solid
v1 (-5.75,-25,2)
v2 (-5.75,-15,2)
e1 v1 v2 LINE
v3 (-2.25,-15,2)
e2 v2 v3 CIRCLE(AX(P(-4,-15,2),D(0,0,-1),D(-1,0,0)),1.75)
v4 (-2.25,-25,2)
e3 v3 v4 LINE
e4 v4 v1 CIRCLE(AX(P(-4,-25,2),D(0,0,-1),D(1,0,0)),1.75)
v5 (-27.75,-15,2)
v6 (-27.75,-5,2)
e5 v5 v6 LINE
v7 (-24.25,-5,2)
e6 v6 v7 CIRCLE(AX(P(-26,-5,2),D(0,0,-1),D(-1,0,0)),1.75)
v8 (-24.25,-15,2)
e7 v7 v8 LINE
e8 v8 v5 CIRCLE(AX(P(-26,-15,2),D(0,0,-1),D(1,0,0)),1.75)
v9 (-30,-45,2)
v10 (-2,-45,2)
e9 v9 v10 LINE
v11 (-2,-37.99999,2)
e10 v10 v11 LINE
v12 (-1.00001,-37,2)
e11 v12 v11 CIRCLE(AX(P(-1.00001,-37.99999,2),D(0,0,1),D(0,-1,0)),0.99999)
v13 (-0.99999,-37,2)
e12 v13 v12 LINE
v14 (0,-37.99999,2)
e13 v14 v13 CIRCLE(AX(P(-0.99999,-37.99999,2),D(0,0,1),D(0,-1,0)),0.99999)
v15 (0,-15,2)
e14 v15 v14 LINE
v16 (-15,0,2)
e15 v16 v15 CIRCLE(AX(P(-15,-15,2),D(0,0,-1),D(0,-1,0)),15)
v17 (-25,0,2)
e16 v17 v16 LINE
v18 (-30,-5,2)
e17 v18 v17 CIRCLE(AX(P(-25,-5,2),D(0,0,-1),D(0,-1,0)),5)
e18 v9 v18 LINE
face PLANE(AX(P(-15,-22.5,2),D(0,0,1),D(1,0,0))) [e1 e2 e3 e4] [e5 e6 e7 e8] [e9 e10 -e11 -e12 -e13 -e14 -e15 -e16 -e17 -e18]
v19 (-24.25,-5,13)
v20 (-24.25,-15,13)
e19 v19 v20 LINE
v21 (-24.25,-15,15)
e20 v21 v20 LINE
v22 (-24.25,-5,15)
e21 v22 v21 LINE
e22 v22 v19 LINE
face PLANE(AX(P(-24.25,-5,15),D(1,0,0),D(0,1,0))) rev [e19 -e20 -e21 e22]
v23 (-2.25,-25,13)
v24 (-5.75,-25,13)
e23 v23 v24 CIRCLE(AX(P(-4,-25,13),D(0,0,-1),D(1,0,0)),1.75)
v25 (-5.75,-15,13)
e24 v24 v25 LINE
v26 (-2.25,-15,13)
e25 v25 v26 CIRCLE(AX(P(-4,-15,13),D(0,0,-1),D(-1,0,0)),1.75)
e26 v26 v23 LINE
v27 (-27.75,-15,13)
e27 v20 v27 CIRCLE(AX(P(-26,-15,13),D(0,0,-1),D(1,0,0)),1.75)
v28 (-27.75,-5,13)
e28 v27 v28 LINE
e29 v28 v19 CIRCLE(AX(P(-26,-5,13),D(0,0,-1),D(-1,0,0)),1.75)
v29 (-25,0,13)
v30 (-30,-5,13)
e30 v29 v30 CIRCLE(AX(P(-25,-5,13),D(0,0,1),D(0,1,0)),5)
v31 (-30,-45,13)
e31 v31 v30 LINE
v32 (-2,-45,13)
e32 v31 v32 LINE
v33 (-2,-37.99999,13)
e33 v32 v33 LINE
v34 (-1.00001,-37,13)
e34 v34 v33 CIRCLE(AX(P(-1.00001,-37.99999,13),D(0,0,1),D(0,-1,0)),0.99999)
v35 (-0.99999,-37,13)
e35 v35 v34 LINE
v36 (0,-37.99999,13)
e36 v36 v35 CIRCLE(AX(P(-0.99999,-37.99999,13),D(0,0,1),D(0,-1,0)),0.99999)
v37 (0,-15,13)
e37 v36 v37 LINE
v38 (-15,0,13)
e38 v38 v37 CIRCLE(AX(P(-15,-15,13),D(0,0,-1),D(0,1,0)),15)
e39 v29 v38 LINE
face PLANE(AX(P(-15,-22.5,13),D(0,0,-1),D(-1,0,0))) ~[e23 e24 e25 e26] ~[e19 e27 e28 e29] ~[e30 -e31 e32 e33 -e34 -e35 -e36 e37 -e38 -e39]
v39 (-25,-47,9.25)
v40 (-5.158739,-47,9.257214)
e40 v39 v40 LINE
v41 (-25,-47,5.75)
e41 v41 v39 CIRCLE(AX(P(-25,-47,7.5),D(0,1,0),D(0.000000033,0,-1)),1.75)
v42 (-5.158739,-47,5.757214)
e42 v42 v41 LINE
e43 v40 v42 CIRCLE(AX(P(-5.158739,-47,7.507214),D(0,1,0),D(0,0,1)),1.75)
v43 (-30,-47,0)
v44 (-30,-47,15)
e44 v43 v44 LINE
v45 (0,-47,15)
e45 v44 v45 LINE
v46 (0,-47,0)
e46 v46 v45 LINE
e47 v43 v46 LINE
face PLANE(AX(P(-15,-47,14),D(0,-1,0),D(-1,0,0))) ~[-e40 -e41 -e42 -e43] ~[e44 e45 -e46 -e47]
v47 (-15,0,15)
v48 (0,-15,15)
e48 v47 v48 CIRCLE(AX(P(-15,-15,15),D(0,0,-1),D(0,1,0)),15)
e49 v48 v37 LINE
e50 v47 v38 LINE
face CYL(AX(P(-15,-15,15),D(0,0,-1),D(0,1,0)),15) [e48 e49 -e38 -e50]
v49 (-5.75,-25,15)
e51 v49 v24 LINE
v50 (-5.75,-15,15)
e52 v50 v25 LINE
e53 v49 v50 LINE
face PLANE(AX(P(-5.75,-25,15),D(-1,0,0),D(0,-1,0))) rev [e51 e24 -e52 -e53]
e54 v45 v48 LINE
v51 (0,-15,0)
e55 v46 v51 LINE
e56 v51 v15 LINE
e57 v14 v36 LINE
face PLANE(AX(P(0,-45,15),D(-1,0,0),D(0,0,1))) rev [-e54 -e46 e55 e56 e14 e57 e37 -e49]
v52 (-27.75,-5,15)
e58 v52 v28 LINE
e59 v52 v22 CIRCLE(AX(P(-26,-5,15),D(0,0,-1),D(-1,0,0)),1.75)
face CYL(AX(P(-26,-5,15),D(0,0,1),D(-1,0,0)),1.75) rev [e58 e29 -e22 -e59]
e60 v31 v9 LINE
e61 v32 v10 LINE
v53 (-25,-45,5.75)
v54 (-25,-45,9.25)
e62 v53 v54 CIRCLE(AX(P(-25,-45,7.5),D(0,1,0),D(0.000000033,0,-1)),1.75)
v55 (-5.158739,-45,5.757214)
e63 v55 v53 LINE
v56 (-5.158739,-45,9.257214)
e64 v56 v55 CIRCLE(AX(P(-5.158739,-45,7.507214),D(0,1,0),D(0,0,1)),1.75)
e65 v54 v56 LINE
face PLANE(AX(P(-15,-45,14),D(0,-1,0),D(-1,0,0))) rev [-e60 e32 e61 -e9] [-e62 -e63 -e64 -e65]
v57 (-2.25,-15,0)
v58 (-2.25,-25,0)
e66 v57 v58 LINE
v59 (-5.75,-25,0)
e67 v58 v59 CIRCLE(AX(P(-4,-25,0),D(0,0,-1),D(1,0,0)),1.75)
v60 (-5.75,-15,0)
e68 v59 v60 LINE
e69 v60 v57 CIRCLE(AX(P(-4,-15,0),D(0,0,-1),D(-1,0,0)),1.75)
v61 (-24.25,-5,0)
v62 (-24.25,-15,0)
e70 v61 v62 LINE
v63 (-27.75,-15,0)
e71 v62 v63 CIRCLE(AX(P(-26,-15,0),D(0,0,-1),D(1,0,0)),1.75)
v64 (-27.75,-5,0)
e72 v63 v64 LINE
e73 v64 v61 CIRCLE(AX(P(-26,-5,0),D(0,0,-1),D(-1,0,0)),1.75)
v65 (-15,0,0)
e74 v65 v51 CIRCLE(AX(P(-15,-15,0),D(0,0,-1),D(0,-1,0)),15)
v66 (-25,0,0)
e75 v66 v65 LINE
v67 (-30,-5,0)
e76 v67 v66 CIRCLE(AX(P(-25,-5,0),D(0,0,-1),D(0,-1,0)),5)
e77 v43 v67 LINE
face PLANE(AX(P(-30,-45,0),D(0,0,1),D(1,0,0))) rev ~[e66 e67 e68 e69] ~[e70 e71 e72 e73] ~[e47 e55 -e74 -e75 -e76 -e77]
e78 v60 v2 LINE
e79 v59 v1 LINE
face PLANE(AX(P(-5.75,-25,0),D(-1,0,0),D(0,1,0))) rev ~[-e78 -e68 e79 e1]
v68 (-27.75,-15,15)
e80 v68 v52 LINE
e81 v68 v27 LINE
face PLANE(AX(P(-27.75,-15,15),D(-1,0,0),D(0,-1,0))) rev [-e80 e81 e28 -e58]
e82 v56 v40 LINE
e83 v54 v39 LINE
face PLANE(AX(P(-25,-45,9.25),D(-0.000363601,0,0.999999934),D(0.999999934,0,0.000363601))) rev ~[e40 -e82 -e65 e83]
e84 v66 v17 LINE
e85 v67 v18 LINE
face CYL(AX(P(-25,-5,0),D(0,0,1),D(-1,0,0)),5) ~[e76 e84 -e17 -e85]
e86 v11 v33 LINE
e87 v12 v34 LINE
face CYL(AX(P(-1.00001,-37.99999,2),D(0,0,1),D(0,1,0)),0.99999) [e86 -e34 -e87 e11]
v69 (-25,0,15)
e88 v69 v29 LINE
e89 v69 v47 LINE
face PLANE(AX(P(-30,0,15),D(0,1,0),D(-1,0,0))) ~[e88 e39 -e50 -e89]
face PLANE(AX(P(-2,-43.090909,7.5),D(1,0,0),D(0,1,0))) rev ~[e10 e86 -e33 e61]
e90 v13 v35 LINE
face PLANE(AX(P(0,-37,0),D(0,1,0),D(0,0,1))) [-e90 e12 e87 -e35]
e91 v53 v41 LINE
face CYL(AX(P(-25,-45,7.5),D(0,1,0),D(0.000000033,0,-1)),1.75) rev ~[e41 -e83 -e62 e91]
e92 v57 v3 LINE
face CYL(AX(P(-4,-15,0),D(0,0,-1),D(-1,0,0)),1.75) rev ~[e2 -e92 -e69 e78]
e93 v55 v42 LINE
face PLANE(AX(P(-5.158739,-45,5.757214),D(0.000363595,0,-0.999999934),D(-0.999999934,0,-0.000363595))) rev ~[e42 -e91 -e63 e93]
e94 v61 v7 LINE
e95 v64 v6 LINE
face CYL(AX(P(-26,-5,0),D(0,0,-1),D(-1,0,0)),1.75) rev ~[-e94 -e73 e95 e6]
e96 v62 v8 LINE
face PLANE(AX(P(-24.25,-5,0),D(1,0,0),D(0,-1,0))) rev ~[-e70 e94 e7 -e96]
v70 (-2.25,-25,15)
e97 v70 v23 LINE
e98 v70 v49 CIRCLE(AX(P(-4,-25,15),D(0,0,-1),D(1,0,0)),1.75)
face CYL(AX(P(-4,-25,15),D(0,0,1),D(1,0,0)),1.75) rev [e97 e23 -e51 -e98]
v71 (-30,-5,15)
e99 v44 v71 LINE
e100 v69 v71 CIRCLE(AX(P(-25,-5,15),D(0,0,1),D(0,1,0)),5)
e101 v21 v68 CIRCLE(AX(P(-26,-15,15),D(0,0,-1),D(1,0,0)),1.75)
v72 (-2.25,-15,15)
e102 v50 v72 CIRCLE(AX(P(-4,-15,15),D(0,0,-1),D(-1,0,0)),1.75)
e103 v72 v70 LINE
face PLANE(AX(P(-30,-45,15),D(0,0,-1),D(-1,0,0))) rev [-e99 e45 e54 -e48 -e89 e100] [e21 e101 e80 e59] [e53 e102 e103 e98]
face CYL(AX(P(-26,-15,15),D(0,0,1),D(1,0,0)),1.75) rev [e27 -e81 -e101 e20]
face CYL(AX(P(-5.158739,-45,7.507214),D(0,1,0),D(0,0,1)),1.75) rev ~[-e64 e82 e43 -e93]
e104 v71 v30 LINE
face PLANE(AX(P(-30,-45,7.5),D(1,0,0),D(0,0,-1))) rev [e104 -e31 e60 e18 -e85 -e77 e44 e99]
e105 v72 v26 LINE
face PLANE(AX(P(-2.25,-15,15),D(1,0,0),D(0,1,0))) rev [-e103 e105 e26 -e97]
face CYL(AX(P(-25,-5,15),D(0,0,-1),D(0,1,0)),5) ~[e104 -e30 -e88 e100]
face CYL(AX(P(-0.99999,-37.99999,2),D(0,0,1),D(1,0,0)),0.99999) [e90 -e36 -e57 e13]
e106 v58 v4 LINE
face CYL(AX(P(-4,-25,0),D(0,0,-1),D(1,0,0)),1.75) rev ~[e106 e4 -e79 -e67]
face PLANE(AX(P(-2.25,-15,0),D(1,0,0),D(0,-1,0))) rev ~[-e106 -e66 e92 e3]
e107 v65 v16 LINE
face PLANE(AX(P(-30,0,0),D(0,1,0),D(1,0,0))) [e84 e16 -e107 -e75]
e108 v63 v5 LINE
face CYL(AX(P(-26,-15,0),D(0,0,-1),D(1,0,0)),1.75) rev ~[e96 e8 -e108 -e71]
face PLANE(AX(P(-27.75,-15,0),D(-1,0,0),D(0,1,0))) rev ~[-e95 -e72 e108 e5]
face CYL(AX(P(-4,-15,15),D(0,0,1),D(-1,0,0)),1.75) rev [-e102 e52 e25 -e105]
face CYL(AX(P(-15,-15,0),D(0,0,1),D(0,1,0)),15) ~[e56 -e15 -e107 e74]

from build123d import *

# Parameters (mm, degrees)
F0_W     = 30
F0_H     = 45
F1_DEPTH = 2
F2_W     = 30
F2_H     = 2
F2_H_2   = 5.5
F3_DEPTH = 2
F6_DEPTH = 25
F7_W     = 8
F7_H     = 11
F8_DEPTH = 2
F9_R     = 15
F10_R    = 5
F11_R    = 0.99999


# Not quite as in the source:
# - a fillet or chamfer is up to 0.001 mm smaller than in the source, because OpenCascade refuses the exact size
# - ends of sketch curves that miss each other by under 0.0002 mm in the source are joined


with BuildPart() as f1:
    # F0 (on Top) → F1 (new body)
    with BuildSketch(Plane.XY):
        with Locations((-15, -22.5)):
            Rectangle(F0_W, F0_H)
        with BuildLine():
            ThreePointArc((-27.75, -5), (-26, -3.25), (-24.25, -5))
            Line((-24.25, -5), (-24.25, -15))
            ThreePointArc((-24.25, -15), (-26, -16.75), (-27.75, -15))
            Line((-27.75, -15), (-27.75, -5))
        make_face(mode=Mode.SUBTRACT)
        with BuildLine():
            Line((-2.25, -15), (-2.25, -25))
            ThreePointArc((-2.25, -25), (-4, -26.75), (-5.75, -25))
            Line((-5.75, -25), (-5.75, -15))
            ThreePointArc((-5.75, -15), (-4, -13.25), (-2.25, -15))
        make_face(mode=Mode.SUBTRACT)
    extrude(amount=F1_DEPTH)

    # F2 (on face) → F3 (join)
    with BuildSketch(Plane.XZ.offset(45)):
        with Locations((-15, 1)):
            Rectangle(F2_W, F2_H)
        with Locations((-15, 4.75)):
            Rectangle(F2_W, F2_H_2)
    extrude(amount=F3_DEPTH)

    # F4: F1 across face


with BuildPart() as f1_1:
    add(f1.part)
    add(f1.part.mirror(Plane(origin=(-15, -46, 7.5), x_dir=(1, 0, 0), z_dir=(0, 0, 1))))

    # F5 (on face) → F6 (cut)
    with BuildSketch(Plane(origin=(0, -45, 0), x_dir=(-1, 0, 0), z_dir=(0, 1, 0))):
        with BuildLine():
            ThreePointArc((5.1587387914, 9.2572143), (3.4087387914, 7.5072143), (5.1587387913, 5.7572143))
            Line((5.1587387913, 5.7572143), (25.0000000102, 5.7500001157))
            ThreePointArc((25.0000000102, 5.7500001157), (26.7500000102, 7.5), (25.0000000102, 9.25))
            Line((25.0000000102, 9.25), (5.1587387914, 9.2572143))
        make_face()
    extrude(amount=-F6_DEPTH, mode=Mode.SUBTRACT)

    # F7 (on face) → F8 (join)
    with BuildSketch(Plane.YZ):
        Polygon((-37, 13), (-37, 15), (-47, 15), (-47, 0), (-37, 0), (-37, 2), (-45, 2), (-45, 13), align=None)
        with Locations((-41, 7.5)):
            Rectangle(F7_W, F7_H)
    extrude(amount=-F8_DEPTH)

    # F9
    f9_edges = [f1_1.edges().sort_by_distance(p)[0] for p in [
        (0, 0, 1),
        (0, 0, 14),
    ]]
    fillet(f9_edges, radius=F9_R)

    # F10
    f10_edges = [f1_1.edges().sort_by_distance(p)[0] for p in [
        (-30, 0, 14),
        (-30, 0, 1),
    ]]
    fillet(f10_edges, radius=F10_R)

    # F11 (radius 1 in the source; OpenCascade refuses exactly that, so slightly less here)
    f11_edges = [f1_1.edges().sort_by_distance(p)[0] for p in [
        (-2, -37, 7.5),
        (0, -37, 7.5),
    ]]
    fillet(f11_edges, radius=F11_R)


solid = f1_1.part
